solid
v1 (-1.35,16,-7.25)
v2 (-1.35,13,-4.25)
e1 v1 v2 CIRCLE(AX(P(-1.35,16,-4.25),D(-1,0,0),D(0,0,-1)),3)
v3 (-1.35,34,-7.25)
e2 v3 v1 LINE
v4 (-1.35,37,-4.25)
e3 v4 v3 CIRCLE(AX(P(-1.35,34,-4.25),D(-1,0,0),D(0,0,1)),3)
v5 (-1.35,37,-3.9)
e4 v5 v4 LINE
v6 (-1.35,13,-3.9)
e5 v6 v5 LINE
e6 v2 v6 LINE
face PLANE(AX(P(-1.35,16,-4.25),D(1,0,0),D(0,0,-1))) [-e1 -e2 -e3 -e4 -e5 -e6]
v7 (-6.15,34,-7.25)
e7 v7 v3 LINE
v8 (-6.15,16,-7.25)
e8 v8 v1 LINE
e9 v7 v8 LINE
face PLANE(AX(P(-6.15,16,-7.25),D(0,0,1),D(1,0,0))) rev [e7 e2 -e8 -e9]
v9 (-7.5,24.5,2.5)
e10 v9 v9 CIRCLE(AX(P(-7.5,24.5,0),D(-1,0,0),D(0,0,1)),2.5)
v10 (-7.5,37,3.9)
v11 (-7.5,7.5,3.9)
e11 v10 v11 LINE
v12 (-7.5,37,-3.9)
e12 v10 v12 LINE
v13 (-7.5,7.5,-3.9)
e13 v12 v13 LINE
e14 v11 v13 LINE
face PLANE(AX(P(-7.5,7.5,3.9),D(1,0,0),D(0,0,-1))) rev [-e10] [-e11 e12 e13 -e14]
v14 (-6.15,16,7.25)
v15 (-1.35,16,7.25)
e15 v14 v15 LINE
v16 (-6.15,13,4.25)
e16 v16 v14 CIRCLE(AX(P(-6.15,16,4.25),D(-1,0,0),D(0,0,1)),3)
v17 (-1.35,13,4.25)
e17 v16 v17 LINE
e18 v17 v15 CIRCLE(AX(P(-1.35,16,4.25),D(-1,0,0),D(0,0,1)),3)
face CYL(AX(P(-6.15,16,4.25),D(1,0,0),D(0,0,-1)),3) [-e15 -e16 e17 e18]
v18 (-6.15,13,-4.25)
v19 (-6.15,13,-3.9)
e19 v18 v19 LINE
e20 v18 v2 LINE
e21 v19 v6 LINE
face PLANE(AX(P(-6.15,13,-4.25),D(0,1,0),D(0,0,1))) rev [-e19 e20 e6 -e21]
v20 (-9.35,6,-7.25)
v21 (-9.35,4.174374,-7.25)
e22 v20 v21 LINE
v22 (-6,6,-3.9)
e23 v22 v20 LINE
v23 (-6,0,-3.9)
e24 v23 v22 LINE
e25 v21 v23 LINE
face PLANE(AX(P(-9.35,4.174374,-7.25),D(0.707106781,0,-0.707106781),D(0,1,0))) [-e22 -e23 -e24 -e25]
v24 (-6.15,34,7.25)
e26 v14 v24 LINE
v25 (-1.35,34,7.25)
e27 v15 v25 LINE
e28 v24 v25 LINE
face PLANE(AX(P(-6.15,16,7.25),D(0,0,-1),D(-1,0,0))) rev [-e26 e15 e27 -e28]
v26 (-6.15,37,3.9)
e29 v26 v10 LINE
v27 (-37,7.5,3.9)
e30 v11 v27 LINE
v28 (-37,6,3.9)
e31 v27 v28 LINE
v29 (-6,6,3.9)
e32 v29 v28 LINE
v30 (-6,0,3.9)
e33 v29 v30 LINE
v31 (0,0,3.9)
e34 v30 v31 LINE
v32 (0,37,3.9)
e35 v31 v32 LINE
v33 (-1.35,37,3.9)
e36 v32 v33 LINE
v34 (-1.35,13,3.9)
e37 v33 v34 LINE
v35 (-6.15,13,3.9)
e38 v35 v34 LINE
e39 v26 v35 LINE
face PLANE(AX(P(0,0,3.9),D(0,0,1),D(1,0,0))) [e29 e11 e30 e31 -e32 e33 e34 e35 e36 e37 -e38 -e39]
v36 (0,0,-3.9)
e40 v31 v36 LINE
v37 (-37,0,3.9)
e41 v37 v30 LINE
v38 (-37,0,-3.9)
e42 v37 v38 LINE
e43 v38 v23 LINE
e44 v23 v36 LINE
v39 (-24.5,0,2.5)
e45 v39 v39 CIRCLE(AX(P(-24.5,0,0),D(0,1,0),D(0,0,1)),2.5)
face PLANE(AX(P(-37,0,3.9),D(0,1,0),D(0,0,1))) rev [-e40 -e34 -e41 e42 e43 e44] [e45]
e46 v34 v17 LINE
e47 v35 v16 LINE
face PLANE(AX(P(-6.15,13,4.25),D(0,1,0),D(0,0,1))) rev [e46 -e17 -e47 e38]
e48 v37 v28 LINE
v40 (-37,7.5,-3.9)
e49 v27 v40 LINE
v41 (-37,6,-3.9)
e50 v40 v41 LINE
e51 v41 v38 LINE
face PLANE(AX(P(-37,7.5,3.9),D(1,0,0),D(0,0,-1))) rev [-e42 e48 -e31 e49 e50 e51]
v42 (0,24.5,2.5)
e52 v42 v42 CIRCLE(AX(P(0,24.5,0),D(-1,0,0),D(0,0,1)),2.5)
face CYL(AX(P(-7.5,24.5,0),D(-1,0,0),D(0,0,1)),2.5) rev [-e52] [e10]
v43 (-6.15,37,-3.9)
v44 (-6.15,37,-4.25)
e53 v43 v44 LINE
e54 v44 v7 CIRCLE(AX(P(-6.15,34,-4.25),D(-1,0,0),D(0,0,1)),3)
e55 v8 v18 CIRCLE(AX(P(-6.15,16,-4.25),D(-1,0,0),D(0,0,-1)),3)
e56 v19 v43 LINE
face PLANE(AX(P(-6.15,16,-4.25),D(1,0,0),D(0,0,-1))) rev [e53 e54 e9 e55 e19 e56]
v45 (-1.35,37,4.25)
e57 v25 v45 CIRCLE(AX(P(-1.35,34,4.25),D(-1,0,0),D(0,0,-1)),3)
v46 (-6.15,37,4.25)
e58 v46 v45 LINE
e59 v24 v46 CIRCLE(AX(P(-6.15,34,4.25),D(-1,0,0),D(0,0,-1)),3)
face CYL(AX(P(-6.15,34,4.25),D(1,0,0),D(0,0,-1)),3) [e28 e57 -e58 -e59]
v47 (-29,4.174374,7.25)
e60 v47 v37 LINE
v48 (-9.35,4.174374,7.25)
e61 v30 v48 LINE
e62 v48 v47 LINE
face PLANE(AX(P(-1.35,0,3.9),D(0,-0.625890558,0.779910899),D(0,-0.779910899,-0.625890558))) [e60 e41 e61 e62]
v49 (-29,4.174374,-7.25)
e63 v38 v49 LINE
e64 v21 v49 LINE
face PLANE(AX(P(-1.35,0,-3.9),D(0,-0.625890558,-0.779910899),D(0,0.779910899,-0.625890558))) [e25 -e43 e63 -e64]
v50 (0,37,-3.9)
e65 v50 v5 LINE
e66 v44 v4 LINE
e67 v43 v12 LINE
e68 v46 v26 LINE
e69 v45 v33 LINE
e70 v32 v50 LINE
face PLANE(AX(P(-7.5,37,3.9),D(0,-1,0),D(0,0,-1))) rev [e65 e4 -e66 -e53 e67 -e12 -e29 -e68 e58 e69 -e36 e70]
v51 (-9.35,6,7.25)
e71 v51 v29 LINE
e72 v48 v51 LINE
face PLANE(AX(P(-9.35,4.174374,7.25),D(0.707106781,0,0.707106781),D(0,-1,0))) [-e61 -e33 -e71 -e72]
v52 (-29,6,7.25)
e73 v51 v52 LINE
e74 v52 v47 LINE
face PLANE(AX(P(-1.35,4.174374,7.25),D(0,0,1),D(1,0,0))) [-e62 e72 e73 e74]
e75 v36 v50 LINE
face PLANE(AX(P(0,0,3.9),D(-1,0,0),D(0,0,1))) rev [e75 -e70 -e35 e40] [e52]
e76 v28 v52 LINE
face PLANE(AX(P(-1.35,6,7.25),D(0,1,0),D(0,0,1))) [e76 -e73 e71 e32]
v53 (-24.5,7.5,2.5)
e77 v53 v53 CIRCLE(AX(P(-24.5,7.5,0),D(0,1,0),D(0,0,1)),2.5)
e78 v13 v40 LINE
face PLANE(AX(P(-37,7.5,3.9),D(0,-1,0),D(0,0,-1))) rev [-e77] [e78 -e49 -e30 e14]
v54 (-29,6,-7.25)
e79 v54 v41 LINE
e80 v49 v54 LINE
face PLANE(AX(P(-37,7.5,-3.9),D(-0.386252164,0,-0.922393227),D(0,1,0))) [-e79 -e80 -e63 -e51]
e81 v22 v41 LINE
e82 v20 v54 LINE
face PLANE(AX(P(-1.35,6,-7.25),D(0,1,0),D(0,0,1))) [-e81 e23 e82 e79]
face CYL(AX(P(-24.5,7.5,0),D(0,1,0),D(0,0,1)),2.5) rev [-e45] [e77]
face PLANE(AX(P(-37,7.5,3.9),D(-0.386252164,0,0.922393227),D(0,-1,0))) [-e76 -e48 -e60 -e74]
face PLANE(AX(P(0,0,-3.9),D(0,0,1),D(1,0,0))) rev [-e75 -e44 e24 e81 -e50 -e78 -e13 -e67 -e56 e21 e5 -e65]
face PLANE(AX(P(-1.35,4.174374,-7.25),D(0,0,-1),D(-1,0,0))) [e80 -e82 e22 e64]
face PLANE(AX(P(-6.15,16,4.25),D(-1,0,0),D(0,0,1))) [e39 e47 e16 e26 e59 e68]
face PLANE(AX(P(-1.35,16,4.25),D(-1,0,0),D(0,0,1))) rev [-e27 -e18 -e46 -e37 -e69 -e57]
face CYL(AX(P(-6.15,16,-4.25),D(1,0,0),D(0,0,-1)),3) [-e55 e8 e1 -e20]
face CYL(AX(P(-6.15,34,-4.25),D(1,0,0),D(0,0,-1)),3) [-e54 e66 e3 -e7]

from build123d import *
from OCP.BRepFilletAPI import BRepFilletAPI_MakeChamfer

# Parameters (mm, degrees)
EXTRUDE_1_DEPTH = 3.9
EXTRUDE_2_DEPTH = 35.65
CHAMFER_1_SIZE  = 8
CHAMFER_1_SIZE2 = 3.35
CHAMFER_2_SIZE  = 8
EXTRUDE_3_DEPTH = 2.4


with BuildPart() as part:
    # 草图1 → 凸台-拉伸1 (new, symmetric)
    with BuildSketch(Plane.XY):
        Polygon((-37, 0), (0, 0), (0, 37), (-7.5, 37), (-7.5, 7.5), (-37, 7.5), align=None)
    extrude(amount=EXTRUDE_1_DEPTH, both=True)

    # 草图3 → 凸台-拉伸2 (add)
    with BuildSketch(Plane.ZY.offset(37)):
        Polygon((-3.9, 0), (-7.25, 4.174374383), (-7.25, 6), (-3.9, 6), align=None)
        Polygon((3.9, 6), (3.9, 0), (7.25, 4.174374383), (7.25, 6), align=None)
    extrude(amount=-EXTRUDE_2_DEPTH)

    # 倒角1: one chamfer whose edges measure the first distance from different faces: ONE call of the kernel's chamfer builder (chamfer() names one face for all edges)
    chamfer_1_edges_1 = [part.edges().sort_by_distance(p)[0] for p in [
        (-37, 5.087187192, -7.25),
    ]]
    chamfer_1_side_1 = [part.faces().sort_by_distance(p)[0] for p in [
        (-19.175, 5.087187192, -7.25),
    ]]
    chamfer_1_edges_2 = [part.edges().sort_by_distance(p)[0] for p in [
        (-37, 5.087187192, 7.25),
    ]]
    chamfer_1_side_2 = [part.faces().sort_by_distance(p)[0] for p in [
        (-19.175, 5.087187192, 7.25),
    ]]
    chamfer_1 = BRepFilletAPI_MakeChamfer(part.part.solid().wrapped)
    for e in chamfer_1_edges_1:
        chamfer_1.Add(CHAMFER_1_SIZE, CHAMFER_1_SIZE2, e.wrapped, chamfer_1_side_1[0].wrapped)  # the first distance lies on this face
    for e in chamfer_1_edges_2:
        chamfer_1.Add(CHAMFER_1_SIZE, CHAMFER_1_SIZE2, e.wrapped, chamfer_1_side_2[0].wrapped)  # the first distance lies on this face
    add(Compound.cast(chamfer_1.Shape()), mode=Mode.REPLACE)

    # 倒角2
    # the kernel refuses this chamfer: 8 mm, written as the material it takes off along each edge
    with BuildSketch(Plane(origin=(-1.35, -16.39908952, 7.25), x_dir=(-0.9996219169112968, 0, 0.027495876610586382), z_dir=(0, 1, 0))) as chamfer_2_piece_1_section:
        Polygon((CHAMFER_2_SIZE * 0.999621916911, -CHAMFER_2_SIZE * 0.0274958766106), (-CHAMFER_2_SIZE * 0.0274958766106, -CHAMFER_2_SIZE * 0.999621916911), (0, 0), align=None)
    chamfer_2_piece_1 = extrude(amount=42.972553424, mode=Mode.PRIVATE)
    chamfer_2_piece_1 = split(chamfer_2_piece_1, bisect_by=Plane(origin=(-4.629145345, 5.087187192, 3.9), z_dir=(0, 0, 1)), keep=Keep.TOP, mode=Mode.PRIVATE)
    add(chamfer_2_piece_1, mode=Mode.SUBTRACT)
    with BuildSketch(Plane(origin=(-1.35, -16.39908952, -7.25), x_dir=(-0.9996219169112968, 0, -0.027495876610586382), z_dir=(0, 1, 0))) as chamfer_2_piece_2_section:
        Polygon((CHAMFER_2_SIZE * 0.999621916911, CHAMFER_2_SIZE * 0.0274958766106), (-CHAMFER_2_SIZE * 0.0274958766106, CHAMFER_2_SIZE * 0.999621916911), (0, 0), align=None)
    chamfer_2_piece_2 = extrude(amount=42.972553424, mode=Mode.PRIVATE)
    chamfer_2_piece_2 = split(chamfer_2_piece_2, bisect_by=Plane(origin=(-4.629145345, 5.087187192, -3.9), z_dir=(0, 0, -1)), keep=Keep.TOP, mode=Mode.PRIVATE)
    add(chamfer_2_piece_2, mode=Mode.SUBTRACT)

    # 草图4 → 凸台-拉伸3 (add, symmetric)
    with BuildSketch(Plane.ZY.offset(3.75)):
        with BuildLine():
            Line((-3.9, 37), (-4.25, 37))
            ThreePointArc((-4.25, 37), (-6.371320344, 36.121320344), (-7.25, 34))
            Line((-7.25, 34), (-7.25, 16))
            ThreePointArc((-7.25, 16), (-6.371320344, 13.878679656), (-4.25, 13))
            Line((-4.25, 13), (-3.9, 13))
            Line((-3.9, 13), (-3.9, 37))
        make_face()
        with BuildLine():
            Line((3.9, 37), (3.9, 13))
            Line((3.9, 13), (4.25, 13))
            ThreePointArc((4.25, 13), (6.371320344, 13.878679656), (7.25, 16))
            Line((7.25, 16), (7.25, 34))
            ThreePointArc((7.25, 34), (6.371320344, 36.121320344), (4.25, 37))
            Line((4.25, 37), (3.9, 37))
        make_face()
    extrude(amount=EXTRUDE_3_DEPTH, both=True)

    # 草图6 → M6 螺纹孔1 (revolve, cut)
    with BuildSketch(Plane(origin=(-24.5, 7.5, 0), x_dir=(0, 0, 1), z_dir=(1, 0, 0))):
        Polygon((0, 0), (0, 29.502151548), (2.5, 28), (2.5, 0), align=None)
    hole_wizard_m6_1 = revolve(axis=Axis((-24.5, 13.85, 0), (0, -1, 0)), mode=Mode.SUBTRACT)

    # 镜向1: M6 螺纹孔1 across plane
    add(hole_wizard_m6_1.mirror(Plane(origin=(0, 0, 0), x_dir=(0, 0, 1), z_dir=(-0.7071067811865477, -0.7071067811865475, 0))), mode=Mode.SUBTRACT)


solid = part.part
